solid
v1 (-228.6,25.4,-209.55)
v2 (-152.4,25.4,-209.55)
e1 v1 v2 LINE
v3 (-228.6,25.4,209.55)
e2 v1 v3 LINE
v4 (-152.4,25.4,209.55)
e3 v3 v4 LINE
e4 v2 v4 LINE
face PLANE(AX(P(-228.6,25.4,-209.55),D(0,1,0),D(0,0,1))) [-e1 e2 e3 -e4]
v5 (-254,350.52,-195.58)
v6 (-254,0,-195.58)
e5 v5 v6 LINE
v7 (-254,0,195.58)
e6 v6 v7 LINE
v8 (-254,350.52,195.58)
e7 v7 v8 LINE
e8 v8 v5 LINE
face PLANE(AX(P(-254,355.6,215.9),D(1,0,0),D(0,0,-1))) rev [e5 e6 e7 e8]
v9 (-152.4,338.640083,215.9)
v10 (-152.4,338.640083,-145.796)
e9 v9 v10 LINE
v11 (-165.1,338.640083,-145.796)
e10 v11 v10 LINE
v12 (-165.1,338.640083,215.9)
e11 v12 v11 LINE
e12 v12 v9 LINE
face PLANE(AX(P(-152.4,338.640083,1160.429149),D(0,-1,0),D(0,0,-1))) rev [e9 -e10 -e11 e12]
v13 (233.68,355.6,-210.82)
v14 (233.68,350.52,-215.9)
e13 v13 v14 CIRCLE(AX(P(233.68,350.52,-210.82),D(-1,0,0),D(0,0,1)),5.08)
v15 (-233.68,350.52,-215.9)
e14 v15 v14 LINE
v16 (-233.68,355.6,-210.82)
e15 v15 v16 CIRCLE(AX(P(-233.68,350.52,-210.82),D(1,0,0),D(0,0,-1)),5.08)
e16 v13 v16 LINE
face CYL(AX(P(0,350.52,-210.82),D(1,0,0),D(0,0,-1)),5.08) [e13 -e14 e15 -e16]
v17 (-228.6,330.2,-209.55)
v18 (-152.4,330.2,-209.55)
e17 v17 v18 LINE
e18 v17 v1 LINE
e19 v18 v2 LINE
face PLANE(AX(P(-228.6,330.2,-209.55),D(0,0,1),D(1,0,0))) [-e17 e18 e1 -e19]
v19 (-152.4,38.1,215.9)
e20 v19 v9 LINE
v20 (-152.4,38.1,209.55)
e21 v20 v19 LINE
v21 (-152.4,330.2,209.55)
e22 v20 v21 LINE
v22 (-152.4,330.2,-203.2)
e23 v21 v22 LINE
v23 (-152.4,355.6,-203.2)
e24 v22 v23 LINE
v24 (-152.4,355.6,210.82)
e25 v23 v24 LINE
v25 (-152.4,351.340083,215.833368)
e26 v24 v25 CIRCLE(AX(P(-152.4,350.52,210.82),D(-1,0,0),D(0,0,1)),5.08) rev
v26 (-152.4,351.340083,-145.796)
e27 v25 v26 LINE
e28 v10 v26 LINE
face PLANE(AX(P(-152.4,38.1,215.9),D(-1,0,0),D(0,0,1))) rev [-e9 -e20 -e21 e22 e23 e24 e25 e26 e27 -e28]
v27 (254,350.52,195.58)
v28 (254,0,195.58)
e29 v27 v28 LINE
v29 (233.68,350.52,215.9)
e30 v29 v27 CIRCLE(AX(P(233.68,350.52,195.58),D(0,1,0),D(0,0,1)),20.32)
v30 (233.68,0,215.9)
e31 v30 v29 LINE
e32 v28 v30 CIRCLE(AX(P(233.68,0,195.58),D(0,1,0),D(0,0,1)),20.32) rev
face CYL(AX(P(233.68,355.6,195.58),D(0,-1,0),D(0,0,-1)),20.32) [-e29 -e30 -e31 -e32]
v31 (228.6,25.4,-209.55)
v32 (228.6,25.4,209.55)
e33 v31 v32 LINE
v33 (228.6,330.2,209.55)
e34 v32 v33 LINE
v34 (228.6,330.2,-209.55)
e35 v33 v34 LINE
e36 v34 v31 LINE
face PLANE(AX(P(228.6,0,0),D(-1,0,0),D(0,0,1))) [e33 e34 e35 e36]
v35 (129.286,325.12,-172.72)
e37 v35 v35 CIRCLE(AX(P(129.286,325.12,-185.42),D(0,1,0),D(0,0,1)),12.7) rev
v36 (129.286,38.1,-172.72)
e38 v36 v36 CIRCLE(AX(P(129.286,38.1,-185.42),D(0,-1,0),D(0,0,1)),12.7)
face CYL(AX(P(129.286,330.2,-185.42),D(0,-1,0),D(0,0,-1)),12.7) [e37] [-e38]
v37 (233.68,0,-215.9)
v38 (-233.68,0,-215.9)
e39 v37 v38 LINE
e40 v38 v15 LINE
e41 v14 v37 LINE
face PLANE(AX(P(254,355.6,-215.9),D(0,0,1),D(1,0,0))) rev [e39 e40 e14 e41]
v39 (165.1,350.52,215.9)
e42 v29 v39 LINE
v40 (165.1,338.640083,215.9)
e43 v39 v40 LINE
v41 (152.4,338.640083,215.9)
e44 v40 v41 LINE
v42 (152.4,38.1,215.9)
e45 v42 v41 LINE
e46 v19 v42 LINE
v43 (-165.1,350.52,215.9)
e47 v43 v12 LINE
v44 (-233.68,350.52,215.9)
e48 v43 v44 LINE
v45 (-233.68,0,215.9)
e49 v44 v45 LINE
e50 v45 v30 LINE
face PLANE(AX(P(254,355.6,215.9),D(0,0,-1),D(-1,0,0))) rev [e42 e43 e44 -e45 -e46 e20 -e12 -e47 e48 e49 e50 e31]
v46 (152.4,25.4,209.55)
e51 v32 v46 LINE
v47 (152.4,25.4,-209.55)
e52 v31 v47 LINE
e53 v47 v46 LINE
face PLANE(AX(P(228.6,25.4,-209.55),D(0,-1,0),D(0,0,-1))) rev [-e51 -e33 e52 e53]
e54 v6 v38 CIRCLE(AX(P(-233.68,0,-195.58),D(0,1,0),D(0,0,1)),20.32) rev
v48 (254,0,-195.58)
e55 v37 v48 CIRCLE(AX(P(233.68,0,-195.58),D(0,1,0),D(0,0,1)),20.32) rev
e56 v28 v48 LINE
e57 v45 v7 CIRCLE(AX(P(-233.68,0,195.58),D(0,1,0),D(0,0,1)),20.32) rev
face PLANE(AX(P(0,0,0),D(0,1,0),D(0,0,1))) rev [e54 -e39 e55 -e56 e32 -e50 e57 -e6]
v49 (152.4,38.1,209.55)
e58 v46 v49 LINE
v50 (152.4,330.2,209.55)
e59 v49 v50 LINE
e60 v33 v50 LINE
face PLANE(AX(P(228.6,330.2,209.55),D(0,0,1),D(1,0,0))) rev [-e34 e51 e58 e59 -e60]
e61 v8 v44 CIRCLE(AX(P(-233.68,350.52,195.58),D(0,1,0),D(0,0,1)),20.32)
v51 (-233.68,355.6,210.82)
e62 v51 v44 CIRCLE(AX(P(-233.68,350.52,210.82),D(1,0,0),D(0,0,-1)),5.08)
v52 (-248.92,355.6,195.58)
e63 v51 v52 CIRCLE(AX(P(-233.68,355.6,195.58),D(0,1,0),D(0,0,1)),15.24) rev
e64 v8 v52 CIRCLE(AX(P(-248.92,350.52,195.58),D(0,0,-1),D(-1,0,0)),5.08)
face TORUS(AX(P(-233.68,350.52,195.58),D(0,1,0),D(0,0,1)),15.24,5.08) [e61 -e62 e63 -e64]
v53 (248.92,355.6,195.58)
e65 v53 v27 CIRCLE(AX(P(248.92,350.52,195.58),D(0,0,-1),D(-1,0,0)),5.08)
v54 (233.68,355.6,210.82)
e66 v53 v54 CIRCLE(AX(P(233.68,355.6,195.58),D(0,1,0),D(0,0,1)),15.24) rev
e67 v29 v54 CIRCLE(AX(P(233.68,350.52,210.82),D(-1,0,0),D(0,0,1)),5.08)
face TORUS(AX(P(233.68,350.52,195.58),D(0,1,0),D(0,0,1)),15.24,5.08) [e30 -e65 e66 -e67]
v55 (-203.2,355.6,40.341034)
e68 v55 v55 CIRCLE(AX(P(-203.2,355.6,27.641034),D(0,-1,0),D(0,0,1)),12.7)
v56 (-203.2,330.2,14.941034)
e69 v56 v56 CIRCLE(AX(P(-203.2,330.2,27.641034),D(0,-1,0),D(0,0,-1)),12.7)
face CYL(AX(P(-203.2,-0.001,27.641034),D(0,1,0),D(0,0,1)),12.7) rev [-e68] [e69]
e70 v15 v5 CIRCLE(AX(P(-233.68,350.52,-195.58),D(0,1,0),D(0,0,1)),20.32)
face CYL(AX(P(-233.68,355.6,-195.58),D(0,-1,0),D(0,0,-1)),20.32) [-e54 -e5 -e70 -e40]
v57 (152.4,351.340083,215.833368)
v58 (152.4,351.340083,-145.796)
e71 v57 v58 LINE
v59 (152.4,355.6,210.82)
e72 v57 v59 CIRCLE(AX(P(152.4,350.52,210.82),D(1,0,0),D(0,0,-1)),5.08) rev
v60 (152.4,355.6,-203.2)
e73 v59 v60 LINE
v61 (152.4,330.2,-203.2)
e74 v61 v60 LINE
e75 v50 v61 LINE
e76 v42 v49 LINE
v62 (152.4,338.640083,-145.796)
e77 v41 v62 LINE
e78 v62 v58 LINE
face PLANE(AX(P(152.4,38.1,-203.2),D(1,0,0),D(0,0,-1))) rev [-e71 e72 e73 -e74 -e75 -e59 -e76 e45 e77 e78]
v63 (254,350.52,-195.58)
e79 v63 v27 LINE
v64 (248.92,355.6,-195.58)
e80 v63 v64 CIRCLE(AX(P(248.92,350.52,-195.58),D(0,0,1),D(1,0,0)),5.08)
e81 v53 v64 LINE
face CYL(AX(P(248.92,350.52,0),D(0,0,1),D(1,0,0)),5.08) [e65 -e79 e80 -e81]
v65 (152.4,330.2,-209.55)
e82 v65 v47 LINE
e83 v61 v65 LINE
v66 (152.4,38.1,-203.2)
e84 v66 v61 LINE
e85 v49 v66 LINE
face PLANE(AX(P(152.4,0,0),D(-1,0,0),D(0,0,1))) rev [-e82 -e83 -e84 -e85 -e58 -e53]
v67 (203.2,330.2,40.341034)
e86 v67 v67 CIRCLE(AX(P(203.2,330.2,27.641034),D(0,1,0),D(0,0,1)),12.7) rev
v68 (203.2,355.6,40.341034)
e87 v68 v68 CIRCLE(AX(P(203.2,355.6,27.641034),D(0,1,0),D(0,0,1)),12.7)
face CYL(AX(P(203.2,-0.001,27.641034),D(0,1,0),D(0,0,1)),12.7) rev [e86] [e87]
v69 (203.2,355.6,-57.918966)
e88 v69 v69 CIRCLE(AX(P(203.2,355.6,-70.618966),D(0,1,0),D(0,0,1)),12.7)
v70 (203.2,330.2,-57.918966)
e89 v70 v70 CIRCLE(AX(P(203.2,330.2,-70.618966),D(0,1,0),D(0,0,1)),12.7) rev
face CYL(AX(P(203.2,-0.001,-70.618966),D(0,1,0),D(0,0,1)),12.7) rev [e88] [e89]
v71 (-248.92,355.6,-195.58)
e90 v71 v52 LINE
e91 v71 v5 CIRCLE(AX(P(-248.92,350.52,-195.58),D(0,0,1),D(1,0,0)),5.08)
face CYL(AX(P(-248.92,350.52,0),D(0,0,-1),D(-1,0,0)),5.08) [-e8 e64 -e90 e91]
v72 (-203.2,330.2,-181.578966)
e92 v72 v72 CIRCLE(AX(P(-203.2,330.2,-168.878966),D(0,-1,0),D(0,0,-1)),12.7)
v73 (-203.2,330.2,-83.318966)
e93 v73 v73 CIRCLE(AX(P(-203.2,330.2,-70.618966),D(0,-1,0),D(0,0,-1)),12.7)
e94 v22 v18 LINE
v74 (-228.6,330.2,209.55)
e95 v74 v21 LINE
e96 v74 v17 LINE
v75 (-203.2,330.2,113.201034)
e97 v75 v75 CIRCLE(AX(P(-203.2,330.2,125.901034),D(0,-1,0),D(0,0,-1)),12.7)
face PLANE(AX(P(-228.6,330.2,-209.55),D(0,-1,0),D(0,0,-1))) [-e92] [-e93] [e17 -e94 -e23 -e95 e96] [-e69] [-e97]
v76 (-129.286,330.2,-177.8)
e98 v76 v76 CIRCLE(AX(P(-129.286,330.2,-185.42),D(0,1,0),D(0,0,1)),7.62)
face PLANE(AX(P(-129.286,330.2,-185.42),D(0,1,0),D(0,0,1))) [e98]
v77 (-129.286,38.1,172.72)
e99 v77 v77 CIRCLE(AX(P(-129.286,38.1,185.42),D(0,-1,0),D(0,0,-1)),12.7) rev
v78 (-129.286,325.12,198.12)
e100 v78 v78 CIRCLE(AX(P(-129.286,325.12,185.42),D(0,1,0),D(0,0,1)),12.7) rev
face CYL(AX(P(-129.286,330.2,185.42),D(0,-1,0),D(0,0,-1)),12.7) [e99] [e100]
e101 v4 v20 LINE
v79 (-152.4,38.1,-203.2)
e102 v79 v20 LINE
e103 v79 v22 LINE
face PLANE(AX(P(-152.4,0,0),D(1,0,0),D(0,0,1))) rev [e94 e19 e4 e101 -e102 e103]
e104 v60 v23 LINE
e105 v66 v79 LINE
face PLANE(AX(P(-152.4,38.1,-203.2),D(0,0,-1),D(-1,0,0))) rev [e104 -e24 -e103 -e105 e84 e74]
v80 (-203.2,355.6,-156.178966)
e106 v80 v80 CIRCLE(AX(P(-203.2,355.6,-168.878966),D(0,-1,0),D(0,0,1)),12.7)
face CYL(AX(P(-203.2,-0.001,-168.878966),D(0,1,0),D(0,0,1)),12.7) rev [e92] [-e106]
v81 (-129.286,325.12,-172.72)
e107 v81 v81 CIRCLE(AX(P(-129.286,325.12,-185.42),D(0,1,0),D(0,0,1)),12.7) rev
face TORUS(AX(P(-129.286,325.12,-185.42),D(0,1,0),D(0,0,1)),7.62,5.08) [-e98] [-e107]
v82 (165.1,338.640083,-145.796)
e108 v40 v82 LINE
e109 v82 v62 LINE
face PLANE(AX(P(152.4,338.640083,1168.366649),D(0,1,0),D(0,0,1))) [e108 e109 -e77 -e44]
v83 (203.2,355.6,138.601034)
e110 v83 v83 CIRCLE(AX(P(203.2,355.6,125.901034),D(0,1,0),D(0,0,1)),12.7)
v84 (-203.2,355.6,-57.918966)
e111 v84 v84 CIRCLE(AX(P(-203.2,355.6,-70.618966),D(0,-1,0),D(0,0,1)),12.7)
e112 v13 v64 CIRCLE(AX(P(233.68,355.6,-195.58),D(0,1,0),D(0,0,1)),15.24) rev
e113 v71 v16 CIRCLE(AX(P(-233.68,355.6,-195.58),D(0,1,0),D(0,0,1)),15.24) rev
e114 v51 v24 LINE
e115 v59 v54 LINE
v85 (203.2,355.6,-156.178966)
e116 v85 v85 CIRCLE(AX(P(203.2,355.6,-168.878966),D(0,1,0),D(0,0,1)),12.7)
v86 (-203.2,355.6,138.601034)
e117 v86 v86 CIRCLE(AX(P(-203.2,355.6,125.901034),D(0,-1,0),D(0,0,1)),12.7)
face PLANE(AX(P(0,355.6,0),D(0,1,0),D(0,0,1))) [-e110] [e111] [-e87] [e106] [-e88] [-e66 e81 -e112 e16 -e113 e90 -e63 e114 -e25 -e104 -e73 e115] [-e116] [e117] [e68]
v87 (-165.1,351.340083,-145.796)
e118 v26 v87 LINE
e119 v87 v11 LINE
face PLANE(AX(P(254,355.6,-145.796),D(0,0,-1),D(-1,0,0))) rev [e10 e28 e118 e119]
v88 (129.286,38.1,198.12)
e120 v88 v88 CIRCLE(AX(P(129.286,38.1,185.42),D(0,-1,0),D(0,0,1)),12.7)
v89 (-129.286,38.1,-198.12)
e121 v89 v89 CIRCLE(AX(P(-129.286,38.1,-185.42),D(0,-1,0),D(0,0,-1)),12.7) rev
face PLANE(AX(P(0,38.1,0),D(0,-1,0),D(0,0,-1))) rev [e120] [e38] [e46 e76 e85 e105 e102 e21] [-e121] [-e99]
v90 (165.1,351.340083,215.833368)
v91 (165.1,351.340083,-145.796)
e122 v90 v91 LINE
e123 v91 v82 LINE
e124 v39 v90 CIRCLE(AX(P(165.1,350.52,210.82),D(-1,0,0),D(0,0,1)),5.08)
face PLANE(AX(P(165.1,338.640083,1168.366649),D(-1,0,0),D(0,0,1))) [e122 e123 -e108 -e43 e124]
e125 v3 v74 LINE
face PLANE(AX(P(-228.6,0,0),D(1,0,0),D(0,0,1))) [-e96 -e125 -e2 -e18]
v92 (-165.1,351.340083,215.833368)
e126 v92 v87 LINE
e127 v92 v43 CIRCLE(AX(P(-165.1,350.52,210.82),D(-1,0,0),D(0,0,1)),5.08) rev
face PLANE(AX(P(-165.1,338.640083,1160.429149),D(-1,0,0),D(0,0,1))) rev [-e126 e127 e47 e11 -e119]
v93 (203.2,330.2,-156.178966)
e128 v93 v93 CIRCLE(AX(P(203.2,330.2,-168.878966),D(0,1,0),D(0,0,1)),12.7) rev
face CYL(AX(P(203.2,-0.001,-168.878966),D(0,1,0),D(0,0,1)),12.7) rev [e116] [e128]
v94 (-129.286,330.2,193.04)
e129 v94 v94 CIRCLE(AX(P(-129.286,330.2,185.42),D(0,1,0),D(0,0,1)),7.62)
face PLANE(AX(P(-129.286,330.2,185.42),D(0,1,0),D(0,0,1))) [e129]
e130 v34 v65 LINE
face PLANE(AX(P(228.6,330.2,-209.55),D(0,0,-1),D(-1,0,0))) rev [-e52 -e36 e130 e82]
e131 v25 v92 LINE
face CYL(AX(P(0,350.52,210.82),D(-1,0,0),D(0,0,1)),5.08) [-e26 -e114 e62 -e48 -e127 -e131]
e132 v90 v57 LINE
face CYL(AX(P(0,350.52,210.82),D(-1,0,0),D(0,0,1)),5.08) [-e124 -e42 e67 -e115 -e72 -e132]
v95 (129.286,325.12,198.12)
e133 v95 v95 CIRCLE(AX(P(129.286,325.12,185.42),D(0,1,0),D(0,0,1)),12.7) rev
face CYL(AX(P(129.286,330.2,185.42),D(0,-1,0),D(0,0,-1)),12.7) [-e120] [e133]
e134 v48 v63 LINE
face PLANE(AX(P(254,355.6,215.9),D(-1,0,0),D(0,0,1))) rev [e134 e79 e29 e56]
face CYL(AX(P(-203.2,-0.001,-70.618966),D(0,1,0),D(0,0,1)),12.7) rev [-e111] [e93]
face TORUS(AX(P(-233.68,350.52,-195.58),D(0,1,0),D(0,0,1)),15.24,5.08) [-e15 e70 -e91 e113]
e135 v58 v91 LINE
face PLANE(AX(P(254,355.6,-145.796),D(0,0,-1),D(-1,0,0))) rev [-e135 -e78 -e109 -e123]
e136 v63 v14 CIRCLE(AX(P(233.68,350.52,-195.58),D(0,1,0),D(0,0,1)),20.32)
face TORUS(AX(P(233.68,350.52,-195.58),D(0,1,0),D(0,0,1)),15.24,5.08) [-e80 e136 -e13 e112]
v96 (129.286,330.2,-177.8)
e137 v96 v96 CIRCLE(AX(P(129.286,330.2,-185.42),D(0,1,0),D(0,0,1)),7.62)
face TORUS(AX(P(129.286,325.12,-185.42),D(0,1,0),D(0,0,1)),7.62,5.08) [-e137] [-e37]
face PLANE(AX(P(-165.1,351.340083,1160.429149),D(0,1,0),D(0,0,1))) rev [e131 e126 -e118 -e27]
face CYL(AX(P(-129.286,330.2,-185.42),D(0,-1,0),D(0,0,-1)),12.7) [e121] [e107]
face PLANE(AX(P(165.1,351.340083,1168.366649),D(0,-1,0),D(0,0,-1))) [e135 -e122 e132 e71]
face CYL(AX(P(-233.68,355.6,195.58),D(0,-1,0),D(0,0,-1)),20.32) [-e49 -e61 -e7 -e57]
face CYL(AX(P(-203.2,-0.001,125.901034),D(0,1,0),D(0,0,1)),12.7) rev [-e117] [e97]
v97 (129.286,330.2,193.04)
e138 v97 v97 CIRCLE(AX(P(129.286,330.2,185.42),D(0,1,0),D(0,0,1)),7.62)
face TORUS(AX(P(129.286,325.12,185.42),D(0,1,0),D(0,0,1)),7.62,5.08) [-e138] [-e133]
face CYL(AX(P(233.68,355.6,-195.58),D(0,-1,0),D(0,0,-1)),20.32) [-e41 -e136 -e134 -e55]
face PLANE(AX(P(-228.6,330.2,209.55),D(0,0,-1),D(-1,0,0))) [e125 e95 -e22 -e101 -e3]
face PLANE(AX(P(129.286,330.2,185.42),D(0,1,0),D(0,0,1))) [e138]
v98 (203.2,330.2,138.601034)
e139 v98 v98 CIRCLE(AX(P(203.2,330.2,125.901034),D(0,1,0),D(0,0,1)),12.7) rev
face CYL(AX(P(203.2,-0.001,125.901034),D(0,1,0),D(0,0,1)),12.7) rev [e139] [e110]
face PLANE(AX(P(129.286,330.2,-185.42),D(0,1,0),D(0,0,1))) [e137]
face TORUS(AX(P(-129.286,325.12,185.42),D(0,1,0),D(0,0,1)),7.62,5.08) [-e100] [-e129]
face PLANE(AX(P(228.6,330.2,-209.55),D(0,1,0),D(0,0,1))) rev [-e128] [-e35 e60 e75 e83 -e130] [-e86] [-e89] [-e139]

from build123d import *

# Parameters (mm, degrees)
SKETCH1_W               = 508
SKETCH1_H               = 431.8
BOSS_EXTRUDE1_DEPTH     = 355.6
SKETCH2_W               = 304.8
SKETCH2_H               = 419.1
CUT_EXTRUDE1_DEPTH      = 317.5
SKETCH3_W               = 419.1
SKETCH3_H               = 304.8
CUT_EXTRUDE2_DEPTH      = 76.2
CUT_EXTRUDE3_REACH      = 489.422
SKETCH4_R               = 12.7
LPATTERN1_COUNT         = 4
LPATTERN1_PITCH         = 98.26
MIRROR2_COPY_1_REACH    = 489.422
MIRROR2_COPY_1_SKETCH_R = 12.7
MIRROR2_COPY_2_REACH    = 489.422
MIRROR2_COPY_2_SKETCH_R = 12.7
MIRROR2_COPY_3_REACH    = 489.422
MIRROR2_COPY_3_SKETCH_R = 12.7
CUT_EXTRUDE4_START      = -361.696
SKETCH6_W               = 12.7
SKETCH6_H               = 12.7
CUT_EXTRUDE4_DEPTH      = 977.04004042
SKETCH8_R               = 12.7
BOSS_EXTRUDE2_DEPTH     = 292.1
FILLET1_R               = 5.08
FILLET2_R               = 20.32


with BuildPart() as part:
    # Sketch1 → Boss-Extrude1 (new body)
    with BuildSketch(Plane(origin=(0, 0, 0), x_dir=(1, 0, 0), z_dir=(0, 1, 0))):
        Rectangle(SKETCH1_W, SKETCH1_H)
    extrude(amount=BOSS_EXTRUDE1_DEPTH)

    # Sketch2 → Cut-Extrude1 (cut)
    with BuildSketch(Plane(origin=(0, 355.6, 0), x_dir=(1, 0, 0), z_dir=(0, 1, 0))):
        with Locations((0, -6.35)):
            Rectangle(SKETCH2_W, SKETCH2_H)
    extrude(amount=-CUT_EXTRUDE1_DEPTH, mode=Mode.SUBTRACT)

    # Sketch3 → Cut-Extrude2 (cut)
    with BuildSketch(Plane.ZY.offset(-152.4)):
        with Locations((0, 177.8)):
            Rectangle(SKETCH3_W, SKETCH3_H)
    cut_extrude2 = extrude(amount=-CUT_EXTRUDE2_DEPTH, mode=Mode.SUBTRACT)

    # Sketch4 → Cut-Extrude3 (cut, up to next)
    with BuildSketch(Plane(origin=(0, 355.6, 0), x_dir=(1, 0, 0), z_dir=(0, 1, 0)), mode=Mode.PRIVATE) as cut_extrude3_sk1:
        with Locations(Location((203.2, 168.878965906, 0), (0, 0, 270))):
            Circle(SKETCH4_R)
    cut_extrude3_tool1 = extrude(cut_extrude3_sk1.sketch, amount=-CUT_EXTRUDE3_REACH, mode=Mode.PRIVATE) & part.part
    cut_extrude3 = cut_extrude3_tool1.solids().sort_by_distance((203.2, 355.6, -168.878966))[0]
    add(cut_extrude3, mode=Mode.SUBTRACT)

    # LPattern1: Cut-Extrude3 ×4
    with Locations(*[(0, 0, i * LPATTERN1_PITCH) for i in range(1, LPATTERN1_COUNT)]):
        add(cut_extrude3, mode=Mode.SUBTRACT)

    # Mirror2: Cut-Extrude2, Cut-Extrude3 across plane
    add(cut_extrude2.mirror(Plane(origin=(0, 0, 0), x_dir=(0, 0, 1), z_dir=(1, 0, 0))), mode=Mode.SUBTRACT)
    add(cut_extrude3.mirror(Plane(origin=(0, 0, 0), x_dir=(0, 0, 1), z_dir=(1, 0, 0))), mode=Mode.SUBTRACT)

    # Mirror2 copy 1 sketch → Mirror2 copy 1 (cut, up to next)
    with BuildSketch(Plane(origin=(0, 355.6, 98.26), x_dir=(-1, 0, 0), z_dir=(0, 1, 0)), mode=Mode.PRIVATE) as mirror2_copy_1_sk1:
        with Locations((203.2, -168.878965906)):
            Circle(MIRROR2_COPY_1_SKETCH_R)
    mirror2_copy_1_tool1 = extrude(mirror2_copy_1_sk1.sketch, amount=-MIRROR2_COPY_1_REACH, mode=Mode.PRIVATE) & part.part
    add(mirror2_copy_1_tool1.solids().sort_by_distance((-203.2, 355.6, -70.618966))[0], mode=Mode.SUBTRACT)

    # Mirror2 copy 2 sketch → Mirror2 copy 2 (cut, up to next)
    with BuildSketch(Plane(origin=(0, 355.6, 196.52), x_dir=(-1, 0, 0), z_dir=(0, 1, 0)), mode=Mode.PRIVATE) as mirror2_copy_2_sk1:
        with Locations((203.2, -168.878965906)):
            Circle(MIRROR2_COPY_2_SKETCH_R)
    mirror2_copy_2_tool1 = extrude(mirror2_copy_2_sk1.sketch, amount=-MIRROR2_COPY_2_REACH, mode=Mode.PRIVATE) & part.part
    add(mirror2_copy_2_tool1.solids().sort_by_distance((-203.2, 355.6, 27.641034))[0], mode=Mode.SUBTRACT)

    # Mirror2 copy 3 sketch → Mirror2 copy 3 (cut, up to next)
    with BuildSketch(Plane(origin=(0, 355.6, 294.78), x_dir=(-1, 0, 0), z_dir=(0, 1, 0)), mode=Mode.PRIVATE) as mirror2_copy_3_sk1:
        with Locations((203.2, -168.878965906)):
            Circle(MIRROR2_COPY_3_SKETCH_R)
    mirror2_copy_3_tool1 = extrude(mirror2_copy_3_sk1.sketch, amount=-MIRROR2_COPY_3_REACH, mode=Mode.PRIVATE) & part.part
    add(mirror2_copy_3_tool1.solids().sort_by_distance((-203.2, 355.6, 125.901034))[0], mode=Mode.SUBTRACT)

    # Sketch6 → Cut-Extrude4 (cut)
    with BuildSketch(Plane.XY.offset(215.9).offset(CUT_EXTRUDE4_START)):
        with Locations((158.75, 344.990083106)):
            Rectangle(SKETCH6_W, SKETCH6_H)
    cut_extrude4 = extrude(amount=CUT_EXTRUDE4_DEPTH, mode=Mode.SUBTRACT)

    # Mirror3: Cut-Extrude4 across plane
    add(cut_extrude4.mirror(Plane(origin=(0, 0, 0), x_dir=(0, 0, 1), z_dir=(1, 0, 0))), mode=Mode.SUBTRACT)

    # Sketch8 → Boss-Extrude2 (add)
    with BuildSketch(Plane(origin=(0, 38.1, 0), x_dir=(1, 0, 0), z_dir=(0, 1, 0))):
        with Locations(Location((-129.286, 185.42, 0), (0, 0, 90))):
            Circle(SKETCH8_R)
        with Locations(Location((-129.286, -185.42, 0), (0, 0, 90))):
            Circle(SKETCH8_R)
    boss_extrude2 = extrude(amount=BOSS_EXTRUDE2_DEPTH)

    # Mirror4: Boss-Extrude2 across plane
    add(boss_extrude2.mirror(Plane(origin=(0, 0, 0), x_dir=(0, 0, 1), z_dir=(1, 0, 0))))

    # Fillet1
    fillet1_edges = [part.edges().sort_by_distance(p)[0] for p in [
        (129.286, 330.2, -172.72),
        (-129.286, 330.2, -172.72),
        (129.286, 330.2, 198.12),
        (-129.286, 330.2, 198.12),
        (203.2, 355.6, 215.9),
        (254, 355.6, 0),
        (0, 355.6, -215.9),
        (-203.2, 355.6, 215.9),
        (-254, 355.6, 0),
    ]]
    fillet(fillet1_edges, radius=FILLET1_R)

    # Fillet2
    # the kernel refuses this fillet: 20.32 mm, written as the material it takes off along each edge
    with BuildSketch(Plane(origin=(-233.68, 355.6, 195.58), x_dir=(-1, 0, 0), z_dir=(0, 0, -1))) as fillet2_piece_1:
        with BuildLine():
            CenterArc((15.24, -5.08), 5.08, 0, 90)
            Line((20.32, -5.08), (20.32, 0))
            Line((20.32, 0), (15.24, 0))
        make_face()
    revolve(axis=Axis((-233.68, 355.6, 195.58), (0, 1, 0)), revolution_arc=90, mode=Mode.SUBTRACT)
    with BuildSketch(Plane(origin=(-233.68, 355.6, -195.58), x_dir=(0, 0, -1), z_dir=(1, 0, 0))) as fillet2_piece_2:
        with BuildLine():
            CenterArc((15.24, -5.08), 5.08, 0, 90)
            Line((20.32, -5.08), (20.32, 0))
            Line((20.32, 0), (15.24, 0))
        make_face()
    revolve(axis=Axis((-233.68, 355.6, -195.58), (0, 1, 0)), revolution_arc=90, mode=Mode.SUBTRACT)
    with BuildSketch(Plane(origin=(233.68, 355.6, -195.58), x_dir=(1, 0, 0), z_dir=(0, 0, 1))) as fillet2_piece_3:
        with BuildLine():
            CenterArc((15.24, -5.08), 5.08, 0, 90)
            Line((20.32, -5.08), (20.32, 0))
            Line((20.32, 0), (15.24, 0))
        make_face()
    revolve(axis=Axis((233.68, 355.6, -195.58), (0, 1, 0)), revolution_arc=90, mode=Mode.SUBTRACT)
    with BuildSketch(Plane(origin=(233.68, 355.6, 195.58), x_dir=(0, 0, 1), z_dir=(-1, 0, 0))) as fillet2_piece_4:
        with BuildLine():
            CenterArc((15.24, -5.08), 5.08, 0, 90)
            Line((20.32, -5.08), (20.32, 0))
            Line((20.32, 0), (15.24, 0))
        make_face()
    revolve(axis=Axis((233.68, 355.6, 195.58), (0, 1, 0)), revolution_arc=90, mode=Mode.SUBTRACT)
    with BuildSketch(Plane(origin=(-254, -50.8, 215.9), x_dir=(1, 0, 0), z_dir=(0, 1, 0)), Plane(origin=(-254, -50.8, -215.9), x_dir=(0, 0, 1), z_dir=(0, 1, 0))) as fillet2_piece_5:
        with BuildLine():
            CenterArc((FILLET2_R, FILLET2_R), FILLET2_R, 180, 90)
            Line((0, FILLET2_R), (0, 0))
            Line((0, 0), (FILLET2_R, 0))
        make_face()
    extrude(amount=406.4, mode=Mode.SUBTRACT)
    with BuildSketch(Plane(origin=(254, -50.8, 215.9), x_dir=(-1, 0, 0), z_dir=(0, 1, 0)), Plane(origin=(254, -50.8, -215.9), x_dir=(0, 0, 1), z_dir=(0, 1, 0))) as fillet2_piece_6:
        with BuildLine():
            CenterArc((FILLET2_R, -FILLET2_R), FILLET2_R, 90, 90)
            Line((0, -FILLET2_R), (0, 0))
            Line((0, 0), (FILLET2_R, 0))
        make_face()
    extrude(amount=406.4, mode=Mode.SUBTRACT)


solid = part.part
